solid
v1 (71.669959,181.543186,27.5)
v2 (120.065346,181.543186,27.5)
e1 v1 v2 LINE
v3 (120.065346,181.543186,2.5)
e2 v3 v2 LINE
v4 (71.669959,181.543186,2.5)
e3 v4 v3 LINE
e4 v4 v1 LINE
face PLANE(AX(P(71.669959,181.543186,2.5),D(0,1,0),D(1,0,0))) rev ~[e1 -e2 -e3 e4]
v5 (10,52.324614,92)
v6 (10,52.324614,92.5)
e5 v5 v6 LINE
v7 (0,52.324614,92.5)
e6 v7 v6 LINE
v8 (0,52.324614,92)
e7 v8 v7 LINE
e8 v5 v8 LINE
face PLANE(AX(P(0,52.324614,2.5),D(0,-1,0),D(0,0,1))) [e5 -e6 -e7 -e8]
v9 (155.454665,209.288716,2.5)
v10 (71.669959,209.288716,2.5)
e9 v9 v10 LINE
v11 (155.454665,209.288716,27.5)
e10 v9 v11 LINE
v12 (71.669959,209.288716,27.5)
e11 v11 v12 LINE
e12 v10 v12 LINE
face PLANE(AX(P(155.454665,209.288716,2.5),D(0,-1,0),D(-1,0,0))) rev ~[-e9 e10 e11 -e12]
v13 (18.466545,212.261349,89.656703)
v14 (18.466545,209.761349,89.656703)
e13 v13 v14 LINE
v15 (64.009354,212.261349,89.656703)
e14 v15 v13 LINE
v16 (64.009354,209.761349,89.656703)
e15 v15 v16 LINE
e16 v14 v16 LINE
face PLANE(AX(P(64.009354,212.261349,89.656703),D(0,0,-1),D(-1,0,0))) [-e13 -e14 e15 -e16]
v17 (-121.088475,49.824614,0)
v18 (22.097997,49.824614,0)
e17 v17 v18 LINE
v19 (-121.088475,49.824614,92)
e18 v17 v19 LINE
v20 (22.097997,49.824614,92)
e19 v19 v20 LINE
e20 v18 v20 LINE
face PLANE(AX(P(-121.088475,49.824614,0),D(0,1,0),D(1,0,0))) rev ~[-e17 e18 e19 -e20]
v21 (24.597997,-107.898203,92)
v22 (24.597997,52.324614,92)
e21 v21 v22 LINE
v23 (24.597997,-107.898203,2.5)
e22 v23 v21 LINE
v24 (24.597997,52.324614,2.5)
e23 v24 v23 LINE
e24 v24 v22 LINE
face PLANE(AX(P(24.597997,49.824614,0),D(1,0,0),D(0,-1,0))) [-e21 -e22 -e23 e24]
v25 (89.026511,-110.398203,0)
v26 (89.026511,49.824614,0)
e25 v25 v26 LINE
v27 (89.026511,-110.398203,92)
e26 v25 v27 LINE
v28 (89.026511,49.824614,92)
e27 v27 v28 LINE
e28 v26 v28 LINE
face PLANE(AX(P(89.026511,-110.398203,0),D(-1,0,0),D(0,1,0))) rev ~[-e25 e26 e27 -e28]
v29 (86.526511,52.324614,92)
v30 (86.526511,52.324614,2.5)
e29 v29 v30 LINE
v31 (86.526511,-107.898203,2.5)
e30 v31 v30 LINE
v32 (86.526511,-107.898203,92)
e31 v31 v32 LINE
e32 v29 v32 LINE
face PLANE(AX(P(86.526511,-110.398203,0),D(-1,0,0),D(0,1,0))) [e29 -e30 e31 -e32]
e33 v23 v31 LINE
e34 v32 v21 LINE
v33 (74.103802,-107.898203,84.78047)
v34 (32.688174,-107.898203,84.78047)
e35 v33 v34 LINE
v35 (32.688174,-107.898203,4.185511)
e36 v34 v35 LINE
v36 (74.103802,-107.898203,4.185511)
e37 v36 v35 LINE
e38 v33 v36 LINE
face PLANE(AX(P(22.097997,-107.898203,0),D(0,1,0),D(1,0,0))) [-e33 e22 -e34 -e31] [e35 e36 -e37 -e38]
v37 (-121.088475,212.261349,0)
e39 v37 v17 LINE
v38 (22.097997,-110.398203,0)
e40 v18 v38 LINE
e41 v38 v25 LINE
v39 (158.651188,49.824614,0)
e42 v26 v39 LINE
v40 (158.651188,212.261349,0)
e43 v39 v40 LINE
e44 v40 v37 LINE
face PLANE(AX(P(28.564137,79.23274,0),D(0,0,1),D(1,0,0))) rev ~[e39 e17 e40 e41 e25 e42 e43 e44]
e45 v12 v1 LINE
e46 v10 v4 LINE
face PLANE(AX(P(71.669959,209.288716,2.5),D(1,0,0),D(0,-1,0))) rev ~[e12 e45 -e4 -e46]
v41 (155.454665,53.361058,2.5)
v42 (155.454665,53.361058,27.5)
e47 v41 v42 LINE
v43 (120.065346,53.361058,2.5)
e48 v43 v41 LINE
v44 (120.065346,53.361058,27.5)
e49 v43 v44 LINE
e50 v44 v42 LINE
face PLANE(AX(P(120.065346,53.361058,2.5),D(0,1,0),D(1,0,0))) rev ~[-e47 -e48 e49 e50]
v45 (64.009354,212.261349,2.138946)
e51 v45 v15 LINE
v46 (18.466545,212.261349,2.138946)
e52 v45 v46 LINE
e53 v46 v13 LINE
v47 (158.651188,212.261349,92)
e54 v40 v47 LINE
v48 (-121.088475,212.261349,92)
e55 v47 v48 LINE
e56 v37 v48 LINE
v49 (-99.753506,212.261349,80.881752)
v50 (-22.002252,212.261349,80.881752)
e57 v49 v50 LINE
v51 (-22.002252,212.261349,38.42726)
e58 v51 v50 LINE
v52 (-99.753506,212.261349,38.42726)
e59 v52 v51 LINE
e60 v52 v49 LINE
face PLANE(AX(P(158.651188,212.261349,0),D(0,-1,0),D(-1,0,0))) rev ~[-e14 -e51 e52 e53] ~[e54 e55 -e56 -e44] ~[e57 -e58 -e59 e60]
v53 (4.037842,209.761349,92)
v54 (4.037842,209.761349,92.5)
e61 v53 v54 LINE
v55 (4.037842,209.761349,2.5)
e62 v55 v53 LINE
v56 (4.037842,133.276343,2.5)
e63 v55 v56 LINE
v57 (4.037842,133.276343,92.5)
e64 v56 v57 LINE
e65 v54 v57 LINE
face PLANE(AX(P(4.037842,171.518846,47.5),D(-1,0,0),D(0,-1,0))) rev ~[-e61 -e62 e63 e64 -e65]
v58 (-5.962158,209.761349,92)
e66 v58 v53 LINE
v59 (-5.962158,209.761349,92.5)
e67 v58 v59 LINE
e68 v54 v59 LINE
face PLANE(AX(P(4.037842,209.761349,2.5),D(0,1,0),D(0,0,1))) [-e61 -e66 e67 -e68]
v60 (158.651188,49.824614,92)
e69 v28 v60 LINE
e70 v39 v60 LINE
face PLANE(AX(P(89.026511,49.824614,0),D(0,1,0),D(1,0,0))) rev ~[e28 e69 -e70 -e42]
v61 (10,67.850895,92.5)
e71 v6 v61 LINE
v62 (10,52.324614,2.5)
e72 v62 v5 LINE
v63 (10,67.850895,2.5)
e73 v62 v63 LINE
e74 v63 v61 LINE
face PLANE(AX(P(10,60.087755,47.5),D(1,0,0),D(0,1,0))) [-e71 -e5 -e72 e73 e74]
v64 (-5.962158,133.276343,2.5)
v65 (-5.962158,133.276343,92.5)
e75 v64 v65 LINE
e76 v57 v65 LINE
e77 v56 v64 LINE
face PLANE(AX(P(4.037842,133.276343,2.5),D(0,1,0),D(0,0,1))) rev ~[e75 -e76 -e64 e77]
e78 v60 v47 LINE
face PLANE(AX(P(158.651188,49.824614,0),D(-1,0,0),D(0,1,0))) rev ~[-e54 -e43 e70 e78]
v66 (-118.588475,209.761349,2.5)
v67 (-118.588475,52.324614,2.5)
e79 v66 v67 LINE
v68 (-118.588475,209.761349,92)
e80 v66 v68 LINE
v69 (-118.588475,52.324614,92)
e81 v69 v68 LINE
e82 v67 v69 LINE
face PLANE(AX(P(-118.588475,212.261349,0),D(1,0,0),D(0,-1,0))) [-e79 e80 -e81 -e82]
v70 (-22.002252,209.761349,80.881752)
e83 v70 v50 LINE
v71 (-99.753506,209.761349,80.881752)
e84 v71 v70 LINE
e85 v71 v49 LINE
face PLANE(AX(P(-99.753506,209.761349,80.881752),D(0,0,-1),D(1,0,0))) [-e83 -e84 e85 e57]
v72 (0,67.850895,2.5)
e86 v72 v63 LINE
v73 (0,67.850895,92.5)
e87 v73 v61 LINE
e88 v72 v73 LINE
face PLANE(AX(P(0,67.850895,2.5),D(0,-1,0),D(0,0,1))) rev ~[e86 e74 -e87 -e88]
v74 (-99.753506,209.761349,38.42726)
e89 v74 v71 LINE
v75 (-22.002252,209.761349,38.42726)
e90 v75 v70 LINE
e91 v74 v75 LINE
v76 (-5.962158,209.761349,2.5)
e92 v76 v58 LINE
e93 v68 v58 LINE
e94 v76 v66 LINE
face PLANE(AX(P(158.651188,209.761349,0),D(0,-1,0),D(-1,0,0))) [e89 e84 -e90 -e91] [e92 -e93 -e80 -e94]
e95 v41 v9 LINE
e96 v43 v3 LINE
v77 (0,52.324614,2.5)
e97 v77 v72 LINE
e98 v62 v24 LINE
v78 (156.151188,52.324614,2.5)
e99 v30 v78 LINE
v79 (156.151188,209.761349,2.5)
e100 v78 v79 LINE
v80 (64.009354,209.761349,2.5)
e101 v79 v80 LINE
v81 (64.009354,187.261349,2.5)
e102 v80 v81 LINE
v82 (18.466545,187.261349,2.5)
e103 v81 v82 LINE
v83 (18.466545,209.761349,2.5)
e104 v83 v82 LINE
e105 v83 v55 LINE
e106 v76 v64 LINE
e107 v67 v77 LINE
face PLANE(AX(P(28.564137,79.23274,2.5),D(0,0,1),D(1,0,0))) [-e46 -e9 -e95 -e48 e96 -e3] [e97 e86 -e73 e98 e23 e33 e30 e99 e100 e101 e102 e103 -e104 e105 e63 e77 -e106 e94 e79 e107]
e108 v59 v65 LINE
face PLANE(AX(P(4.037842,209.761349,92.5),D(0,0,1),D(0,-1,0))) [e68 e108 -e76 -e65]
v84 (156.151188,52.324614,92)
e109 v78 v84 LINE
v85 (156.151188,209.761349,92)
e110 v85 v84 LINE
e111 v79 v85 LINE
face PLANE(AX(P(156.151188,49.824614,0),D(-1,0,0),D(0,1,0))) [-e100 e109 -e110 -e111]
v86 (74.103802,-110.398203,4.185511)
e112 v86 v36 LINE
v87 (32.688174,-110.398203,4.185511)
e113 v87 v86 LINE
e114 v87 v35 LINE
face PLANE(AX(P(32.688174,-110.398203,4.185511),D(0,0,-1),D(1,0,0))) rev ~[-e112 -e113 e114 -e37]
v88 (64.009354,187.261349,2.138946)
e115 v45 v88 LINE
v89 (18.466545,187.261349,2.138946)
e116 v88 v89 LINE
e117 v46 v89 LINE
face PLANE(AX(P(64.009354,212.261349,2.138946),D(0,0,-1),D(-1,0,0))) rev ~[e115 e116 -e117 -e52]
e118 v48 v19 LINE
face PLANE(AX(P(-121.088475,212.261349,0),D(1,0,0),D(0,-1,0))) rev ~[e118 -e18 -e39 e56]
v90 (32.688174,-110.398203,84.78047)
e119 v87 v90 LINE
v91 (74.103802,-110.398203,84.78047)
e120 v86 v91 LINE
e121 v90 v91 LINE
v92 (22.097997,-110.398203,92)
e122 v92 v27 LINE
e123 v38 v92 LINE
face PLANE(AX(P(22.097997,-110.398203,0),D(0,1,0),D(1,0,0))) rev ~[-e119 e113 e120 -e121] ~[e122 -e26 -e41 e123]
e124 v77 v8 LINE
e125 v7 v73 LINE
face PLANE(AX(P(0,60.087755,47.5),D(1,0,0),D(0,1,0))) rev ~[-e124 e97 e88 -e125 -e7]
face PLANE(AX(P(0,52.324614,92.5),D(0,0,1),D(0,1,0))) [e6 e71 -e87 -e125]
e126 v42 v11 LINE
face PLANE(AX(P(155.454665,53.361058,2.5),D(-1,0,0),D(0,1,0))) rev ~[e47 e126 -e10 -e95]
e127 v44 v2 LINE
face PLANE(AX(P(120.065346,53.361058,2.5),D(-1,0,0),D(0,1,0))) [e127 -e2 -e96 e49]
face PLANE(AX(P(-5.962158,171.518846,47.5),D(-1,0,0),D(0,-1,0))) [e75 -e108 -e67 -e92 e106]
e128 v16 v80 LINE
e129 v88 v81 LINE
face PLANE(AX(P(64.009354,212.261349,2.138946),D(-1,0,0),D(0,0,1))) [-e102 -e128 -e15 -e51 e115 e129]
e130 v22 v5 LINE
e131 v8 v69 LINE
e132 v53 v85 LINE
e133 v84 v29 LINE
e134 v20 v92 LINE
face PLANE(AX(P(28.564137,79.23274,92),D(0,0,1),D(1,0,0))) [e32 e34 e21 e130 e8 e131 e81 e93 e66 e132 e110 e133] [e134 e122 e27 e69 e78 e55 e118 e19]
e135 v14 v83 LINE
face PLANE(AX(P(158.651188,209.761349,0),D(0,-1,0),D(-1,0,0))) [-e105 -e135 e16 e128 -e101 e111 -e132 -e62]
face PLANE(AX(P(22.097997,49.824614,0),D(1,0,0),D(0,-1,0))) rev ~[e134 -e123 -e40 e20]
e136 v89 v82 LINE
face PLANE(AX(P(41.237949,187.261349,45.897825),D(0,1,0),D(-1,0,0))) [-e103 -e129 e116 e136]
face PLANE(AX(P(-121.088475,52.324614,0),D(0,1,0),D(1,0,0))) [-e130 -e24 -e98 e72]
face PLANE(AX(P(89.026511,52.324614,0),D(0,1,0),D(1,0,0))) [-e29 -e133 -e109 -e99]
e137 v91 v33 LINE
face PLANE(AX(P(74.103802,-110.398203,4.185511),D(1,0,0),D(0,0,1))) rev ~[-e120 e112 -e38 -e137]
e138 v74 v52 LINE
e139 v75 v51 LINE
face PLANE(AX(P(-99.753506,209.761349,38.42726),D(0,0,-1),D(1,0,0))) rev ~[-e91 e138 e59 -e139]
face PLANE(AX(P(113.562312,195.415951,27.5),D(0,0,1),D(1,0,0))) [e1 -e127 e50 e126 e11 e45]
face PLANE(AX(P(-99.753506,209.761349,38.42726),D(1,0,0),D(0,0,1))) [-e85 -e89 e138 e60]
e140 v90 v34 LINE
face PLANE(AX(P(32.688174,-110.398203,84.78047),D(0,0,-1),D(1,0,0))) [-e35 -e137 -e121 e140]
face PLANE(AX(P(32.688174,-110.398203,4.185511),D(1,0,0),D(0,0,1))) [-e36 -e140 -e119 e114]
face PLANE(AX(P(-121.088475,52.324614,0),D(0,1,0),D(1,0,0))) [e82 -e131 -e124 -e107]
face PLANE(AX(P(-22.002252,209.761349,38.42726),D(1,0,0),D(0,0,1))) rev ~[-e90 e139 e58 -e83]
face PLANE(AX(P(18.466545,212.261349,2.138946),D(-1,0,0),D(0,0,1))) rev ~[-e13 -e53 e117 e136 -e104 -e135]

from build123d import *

# Parameters (mm, degrees)
F1_DEPTH  = 92
F2_T      = -2.5
F4_E13_W  = 76.4850056171
F4_E13_H  = 90
F5_DEPTH  = 10
F7_E14_W  = 15.5262811482
F7_E14_H  = 90
F8_DEPTH  = 10
F9_W      = 41.4156280458
F9_H      = 80.5949582718
F10_DEPTH = 25
F12_W     = 45.5428082496
F12_H     = 87.5177572016
F13_DEPTH = 25
F14_W     = 77.7512546629
F14_H     = 42.4544923007
F15_DEPTH = 25
F16_W     = 35.3893190622
F16_H     = 128.1821280718
F17_DEPTH = 25


with BuildPart() as f1:
    # F0 (on Top) → F1 (new body)
    with BuildSketch(Plane.XY):
        Polygon((22.0979973674, 49.8246140778), (22.0979973674, -110.3982031345), (89.0265107155, -110.3982031345), (89.0265107155, 49.8246140778), (158.6511880159, 49.8246140778), (158.6511880159, 212.2613489628), (0, 212.2613489628), (-121.0884749889, 212.2613489628), (-121.0884749889, 49.8246140778), (0, 49.8246140778), align=None)
    extrude(amount=F1_DEPTH)

    # F2
    f2_openings = [f1.faces().sort_by_distance(p)[0] for p in [
        (25.804053, 100.239761, 92),
    ]]
    offset(amount=F2_T, openings=f2_openings, kind=Kind.INTERSECTION)

    # F4_E13 (on explicit) → F5 (join)
    with BuildSketch(Plane(origin=(4.0378416888, 209.7613489628, 2.5), x_dir=(0, -1, 0), z_dir=(-1, 0, 0))):
        with Locations((38.2425028086, 45)):
            Rectangle(F4_E13_W, F4_E13_H)
    extrude(amount=F5_DEPTH)

    # F7_E14 (on explicit) → F8 (join)
    with BuildSketch(Plane(origin=(0, 52.3246140778, 2.5), x_dir=(0, 1, 0), z_dir=(1, 0, 0))):
        with Locations((7.7631405741, 45)):
            Rectangle(F7_E14_W, F7_E14_H)
    extrude(amount=F8_DEPTH)

    # F9 (on face) → F10 (cut)
    with BuildSketch(Plane.XZ.offset(110.3982031345)):
        with Locations((53.3959884197, 44.4829904009)):
            Rectangle(F9_W, F9_H)
    extrude(amount=-F10_DEPTH, mode=Mode.SUBTRACT)

    # F12 (on face) → F13 (cut)
    with BuildSketch(Plane(origin=(0, 212.2613489628, 0), x_dir=(-1, 0, 0), z_dir=(0, 1, 0))):
        with Locations((-41.2379493937, 45.8978245733)):
            Rectangle(F12_W, F12_H)
    extrude(amount=-F13_DEPTH, mode=Mode.SUBTRACT)

    # F14 (on face) → F15 (cut)
    with BuildSketch(Plane.XZ.offset(-209.7613489628)):
        with Locations((-60.8778791502, 59.6545059234)):
            Rectangle(F14_W, F14_H)
    extrude(amount=-F15_DEPTH, mode=Mode.SUBTRACT)

    # F16 (on face) → F17 (join)
    with BuildSketch(Plane.XY.offset(2.5)):
        Polygon((155.4546654224, 209.2887163162), (71.6699585319, 209.2887163162), (71.6699585319, 181.543186307), (120.0653463602, 181.543186307), (155.4546654224, 181.543186307), align=None)
        with Locations((137.7600058913, 117.4521222711)):
            Rectangle(F16_W, F16_H)
    extrude(amount=F17_DEPTH)


solid = f1.part
